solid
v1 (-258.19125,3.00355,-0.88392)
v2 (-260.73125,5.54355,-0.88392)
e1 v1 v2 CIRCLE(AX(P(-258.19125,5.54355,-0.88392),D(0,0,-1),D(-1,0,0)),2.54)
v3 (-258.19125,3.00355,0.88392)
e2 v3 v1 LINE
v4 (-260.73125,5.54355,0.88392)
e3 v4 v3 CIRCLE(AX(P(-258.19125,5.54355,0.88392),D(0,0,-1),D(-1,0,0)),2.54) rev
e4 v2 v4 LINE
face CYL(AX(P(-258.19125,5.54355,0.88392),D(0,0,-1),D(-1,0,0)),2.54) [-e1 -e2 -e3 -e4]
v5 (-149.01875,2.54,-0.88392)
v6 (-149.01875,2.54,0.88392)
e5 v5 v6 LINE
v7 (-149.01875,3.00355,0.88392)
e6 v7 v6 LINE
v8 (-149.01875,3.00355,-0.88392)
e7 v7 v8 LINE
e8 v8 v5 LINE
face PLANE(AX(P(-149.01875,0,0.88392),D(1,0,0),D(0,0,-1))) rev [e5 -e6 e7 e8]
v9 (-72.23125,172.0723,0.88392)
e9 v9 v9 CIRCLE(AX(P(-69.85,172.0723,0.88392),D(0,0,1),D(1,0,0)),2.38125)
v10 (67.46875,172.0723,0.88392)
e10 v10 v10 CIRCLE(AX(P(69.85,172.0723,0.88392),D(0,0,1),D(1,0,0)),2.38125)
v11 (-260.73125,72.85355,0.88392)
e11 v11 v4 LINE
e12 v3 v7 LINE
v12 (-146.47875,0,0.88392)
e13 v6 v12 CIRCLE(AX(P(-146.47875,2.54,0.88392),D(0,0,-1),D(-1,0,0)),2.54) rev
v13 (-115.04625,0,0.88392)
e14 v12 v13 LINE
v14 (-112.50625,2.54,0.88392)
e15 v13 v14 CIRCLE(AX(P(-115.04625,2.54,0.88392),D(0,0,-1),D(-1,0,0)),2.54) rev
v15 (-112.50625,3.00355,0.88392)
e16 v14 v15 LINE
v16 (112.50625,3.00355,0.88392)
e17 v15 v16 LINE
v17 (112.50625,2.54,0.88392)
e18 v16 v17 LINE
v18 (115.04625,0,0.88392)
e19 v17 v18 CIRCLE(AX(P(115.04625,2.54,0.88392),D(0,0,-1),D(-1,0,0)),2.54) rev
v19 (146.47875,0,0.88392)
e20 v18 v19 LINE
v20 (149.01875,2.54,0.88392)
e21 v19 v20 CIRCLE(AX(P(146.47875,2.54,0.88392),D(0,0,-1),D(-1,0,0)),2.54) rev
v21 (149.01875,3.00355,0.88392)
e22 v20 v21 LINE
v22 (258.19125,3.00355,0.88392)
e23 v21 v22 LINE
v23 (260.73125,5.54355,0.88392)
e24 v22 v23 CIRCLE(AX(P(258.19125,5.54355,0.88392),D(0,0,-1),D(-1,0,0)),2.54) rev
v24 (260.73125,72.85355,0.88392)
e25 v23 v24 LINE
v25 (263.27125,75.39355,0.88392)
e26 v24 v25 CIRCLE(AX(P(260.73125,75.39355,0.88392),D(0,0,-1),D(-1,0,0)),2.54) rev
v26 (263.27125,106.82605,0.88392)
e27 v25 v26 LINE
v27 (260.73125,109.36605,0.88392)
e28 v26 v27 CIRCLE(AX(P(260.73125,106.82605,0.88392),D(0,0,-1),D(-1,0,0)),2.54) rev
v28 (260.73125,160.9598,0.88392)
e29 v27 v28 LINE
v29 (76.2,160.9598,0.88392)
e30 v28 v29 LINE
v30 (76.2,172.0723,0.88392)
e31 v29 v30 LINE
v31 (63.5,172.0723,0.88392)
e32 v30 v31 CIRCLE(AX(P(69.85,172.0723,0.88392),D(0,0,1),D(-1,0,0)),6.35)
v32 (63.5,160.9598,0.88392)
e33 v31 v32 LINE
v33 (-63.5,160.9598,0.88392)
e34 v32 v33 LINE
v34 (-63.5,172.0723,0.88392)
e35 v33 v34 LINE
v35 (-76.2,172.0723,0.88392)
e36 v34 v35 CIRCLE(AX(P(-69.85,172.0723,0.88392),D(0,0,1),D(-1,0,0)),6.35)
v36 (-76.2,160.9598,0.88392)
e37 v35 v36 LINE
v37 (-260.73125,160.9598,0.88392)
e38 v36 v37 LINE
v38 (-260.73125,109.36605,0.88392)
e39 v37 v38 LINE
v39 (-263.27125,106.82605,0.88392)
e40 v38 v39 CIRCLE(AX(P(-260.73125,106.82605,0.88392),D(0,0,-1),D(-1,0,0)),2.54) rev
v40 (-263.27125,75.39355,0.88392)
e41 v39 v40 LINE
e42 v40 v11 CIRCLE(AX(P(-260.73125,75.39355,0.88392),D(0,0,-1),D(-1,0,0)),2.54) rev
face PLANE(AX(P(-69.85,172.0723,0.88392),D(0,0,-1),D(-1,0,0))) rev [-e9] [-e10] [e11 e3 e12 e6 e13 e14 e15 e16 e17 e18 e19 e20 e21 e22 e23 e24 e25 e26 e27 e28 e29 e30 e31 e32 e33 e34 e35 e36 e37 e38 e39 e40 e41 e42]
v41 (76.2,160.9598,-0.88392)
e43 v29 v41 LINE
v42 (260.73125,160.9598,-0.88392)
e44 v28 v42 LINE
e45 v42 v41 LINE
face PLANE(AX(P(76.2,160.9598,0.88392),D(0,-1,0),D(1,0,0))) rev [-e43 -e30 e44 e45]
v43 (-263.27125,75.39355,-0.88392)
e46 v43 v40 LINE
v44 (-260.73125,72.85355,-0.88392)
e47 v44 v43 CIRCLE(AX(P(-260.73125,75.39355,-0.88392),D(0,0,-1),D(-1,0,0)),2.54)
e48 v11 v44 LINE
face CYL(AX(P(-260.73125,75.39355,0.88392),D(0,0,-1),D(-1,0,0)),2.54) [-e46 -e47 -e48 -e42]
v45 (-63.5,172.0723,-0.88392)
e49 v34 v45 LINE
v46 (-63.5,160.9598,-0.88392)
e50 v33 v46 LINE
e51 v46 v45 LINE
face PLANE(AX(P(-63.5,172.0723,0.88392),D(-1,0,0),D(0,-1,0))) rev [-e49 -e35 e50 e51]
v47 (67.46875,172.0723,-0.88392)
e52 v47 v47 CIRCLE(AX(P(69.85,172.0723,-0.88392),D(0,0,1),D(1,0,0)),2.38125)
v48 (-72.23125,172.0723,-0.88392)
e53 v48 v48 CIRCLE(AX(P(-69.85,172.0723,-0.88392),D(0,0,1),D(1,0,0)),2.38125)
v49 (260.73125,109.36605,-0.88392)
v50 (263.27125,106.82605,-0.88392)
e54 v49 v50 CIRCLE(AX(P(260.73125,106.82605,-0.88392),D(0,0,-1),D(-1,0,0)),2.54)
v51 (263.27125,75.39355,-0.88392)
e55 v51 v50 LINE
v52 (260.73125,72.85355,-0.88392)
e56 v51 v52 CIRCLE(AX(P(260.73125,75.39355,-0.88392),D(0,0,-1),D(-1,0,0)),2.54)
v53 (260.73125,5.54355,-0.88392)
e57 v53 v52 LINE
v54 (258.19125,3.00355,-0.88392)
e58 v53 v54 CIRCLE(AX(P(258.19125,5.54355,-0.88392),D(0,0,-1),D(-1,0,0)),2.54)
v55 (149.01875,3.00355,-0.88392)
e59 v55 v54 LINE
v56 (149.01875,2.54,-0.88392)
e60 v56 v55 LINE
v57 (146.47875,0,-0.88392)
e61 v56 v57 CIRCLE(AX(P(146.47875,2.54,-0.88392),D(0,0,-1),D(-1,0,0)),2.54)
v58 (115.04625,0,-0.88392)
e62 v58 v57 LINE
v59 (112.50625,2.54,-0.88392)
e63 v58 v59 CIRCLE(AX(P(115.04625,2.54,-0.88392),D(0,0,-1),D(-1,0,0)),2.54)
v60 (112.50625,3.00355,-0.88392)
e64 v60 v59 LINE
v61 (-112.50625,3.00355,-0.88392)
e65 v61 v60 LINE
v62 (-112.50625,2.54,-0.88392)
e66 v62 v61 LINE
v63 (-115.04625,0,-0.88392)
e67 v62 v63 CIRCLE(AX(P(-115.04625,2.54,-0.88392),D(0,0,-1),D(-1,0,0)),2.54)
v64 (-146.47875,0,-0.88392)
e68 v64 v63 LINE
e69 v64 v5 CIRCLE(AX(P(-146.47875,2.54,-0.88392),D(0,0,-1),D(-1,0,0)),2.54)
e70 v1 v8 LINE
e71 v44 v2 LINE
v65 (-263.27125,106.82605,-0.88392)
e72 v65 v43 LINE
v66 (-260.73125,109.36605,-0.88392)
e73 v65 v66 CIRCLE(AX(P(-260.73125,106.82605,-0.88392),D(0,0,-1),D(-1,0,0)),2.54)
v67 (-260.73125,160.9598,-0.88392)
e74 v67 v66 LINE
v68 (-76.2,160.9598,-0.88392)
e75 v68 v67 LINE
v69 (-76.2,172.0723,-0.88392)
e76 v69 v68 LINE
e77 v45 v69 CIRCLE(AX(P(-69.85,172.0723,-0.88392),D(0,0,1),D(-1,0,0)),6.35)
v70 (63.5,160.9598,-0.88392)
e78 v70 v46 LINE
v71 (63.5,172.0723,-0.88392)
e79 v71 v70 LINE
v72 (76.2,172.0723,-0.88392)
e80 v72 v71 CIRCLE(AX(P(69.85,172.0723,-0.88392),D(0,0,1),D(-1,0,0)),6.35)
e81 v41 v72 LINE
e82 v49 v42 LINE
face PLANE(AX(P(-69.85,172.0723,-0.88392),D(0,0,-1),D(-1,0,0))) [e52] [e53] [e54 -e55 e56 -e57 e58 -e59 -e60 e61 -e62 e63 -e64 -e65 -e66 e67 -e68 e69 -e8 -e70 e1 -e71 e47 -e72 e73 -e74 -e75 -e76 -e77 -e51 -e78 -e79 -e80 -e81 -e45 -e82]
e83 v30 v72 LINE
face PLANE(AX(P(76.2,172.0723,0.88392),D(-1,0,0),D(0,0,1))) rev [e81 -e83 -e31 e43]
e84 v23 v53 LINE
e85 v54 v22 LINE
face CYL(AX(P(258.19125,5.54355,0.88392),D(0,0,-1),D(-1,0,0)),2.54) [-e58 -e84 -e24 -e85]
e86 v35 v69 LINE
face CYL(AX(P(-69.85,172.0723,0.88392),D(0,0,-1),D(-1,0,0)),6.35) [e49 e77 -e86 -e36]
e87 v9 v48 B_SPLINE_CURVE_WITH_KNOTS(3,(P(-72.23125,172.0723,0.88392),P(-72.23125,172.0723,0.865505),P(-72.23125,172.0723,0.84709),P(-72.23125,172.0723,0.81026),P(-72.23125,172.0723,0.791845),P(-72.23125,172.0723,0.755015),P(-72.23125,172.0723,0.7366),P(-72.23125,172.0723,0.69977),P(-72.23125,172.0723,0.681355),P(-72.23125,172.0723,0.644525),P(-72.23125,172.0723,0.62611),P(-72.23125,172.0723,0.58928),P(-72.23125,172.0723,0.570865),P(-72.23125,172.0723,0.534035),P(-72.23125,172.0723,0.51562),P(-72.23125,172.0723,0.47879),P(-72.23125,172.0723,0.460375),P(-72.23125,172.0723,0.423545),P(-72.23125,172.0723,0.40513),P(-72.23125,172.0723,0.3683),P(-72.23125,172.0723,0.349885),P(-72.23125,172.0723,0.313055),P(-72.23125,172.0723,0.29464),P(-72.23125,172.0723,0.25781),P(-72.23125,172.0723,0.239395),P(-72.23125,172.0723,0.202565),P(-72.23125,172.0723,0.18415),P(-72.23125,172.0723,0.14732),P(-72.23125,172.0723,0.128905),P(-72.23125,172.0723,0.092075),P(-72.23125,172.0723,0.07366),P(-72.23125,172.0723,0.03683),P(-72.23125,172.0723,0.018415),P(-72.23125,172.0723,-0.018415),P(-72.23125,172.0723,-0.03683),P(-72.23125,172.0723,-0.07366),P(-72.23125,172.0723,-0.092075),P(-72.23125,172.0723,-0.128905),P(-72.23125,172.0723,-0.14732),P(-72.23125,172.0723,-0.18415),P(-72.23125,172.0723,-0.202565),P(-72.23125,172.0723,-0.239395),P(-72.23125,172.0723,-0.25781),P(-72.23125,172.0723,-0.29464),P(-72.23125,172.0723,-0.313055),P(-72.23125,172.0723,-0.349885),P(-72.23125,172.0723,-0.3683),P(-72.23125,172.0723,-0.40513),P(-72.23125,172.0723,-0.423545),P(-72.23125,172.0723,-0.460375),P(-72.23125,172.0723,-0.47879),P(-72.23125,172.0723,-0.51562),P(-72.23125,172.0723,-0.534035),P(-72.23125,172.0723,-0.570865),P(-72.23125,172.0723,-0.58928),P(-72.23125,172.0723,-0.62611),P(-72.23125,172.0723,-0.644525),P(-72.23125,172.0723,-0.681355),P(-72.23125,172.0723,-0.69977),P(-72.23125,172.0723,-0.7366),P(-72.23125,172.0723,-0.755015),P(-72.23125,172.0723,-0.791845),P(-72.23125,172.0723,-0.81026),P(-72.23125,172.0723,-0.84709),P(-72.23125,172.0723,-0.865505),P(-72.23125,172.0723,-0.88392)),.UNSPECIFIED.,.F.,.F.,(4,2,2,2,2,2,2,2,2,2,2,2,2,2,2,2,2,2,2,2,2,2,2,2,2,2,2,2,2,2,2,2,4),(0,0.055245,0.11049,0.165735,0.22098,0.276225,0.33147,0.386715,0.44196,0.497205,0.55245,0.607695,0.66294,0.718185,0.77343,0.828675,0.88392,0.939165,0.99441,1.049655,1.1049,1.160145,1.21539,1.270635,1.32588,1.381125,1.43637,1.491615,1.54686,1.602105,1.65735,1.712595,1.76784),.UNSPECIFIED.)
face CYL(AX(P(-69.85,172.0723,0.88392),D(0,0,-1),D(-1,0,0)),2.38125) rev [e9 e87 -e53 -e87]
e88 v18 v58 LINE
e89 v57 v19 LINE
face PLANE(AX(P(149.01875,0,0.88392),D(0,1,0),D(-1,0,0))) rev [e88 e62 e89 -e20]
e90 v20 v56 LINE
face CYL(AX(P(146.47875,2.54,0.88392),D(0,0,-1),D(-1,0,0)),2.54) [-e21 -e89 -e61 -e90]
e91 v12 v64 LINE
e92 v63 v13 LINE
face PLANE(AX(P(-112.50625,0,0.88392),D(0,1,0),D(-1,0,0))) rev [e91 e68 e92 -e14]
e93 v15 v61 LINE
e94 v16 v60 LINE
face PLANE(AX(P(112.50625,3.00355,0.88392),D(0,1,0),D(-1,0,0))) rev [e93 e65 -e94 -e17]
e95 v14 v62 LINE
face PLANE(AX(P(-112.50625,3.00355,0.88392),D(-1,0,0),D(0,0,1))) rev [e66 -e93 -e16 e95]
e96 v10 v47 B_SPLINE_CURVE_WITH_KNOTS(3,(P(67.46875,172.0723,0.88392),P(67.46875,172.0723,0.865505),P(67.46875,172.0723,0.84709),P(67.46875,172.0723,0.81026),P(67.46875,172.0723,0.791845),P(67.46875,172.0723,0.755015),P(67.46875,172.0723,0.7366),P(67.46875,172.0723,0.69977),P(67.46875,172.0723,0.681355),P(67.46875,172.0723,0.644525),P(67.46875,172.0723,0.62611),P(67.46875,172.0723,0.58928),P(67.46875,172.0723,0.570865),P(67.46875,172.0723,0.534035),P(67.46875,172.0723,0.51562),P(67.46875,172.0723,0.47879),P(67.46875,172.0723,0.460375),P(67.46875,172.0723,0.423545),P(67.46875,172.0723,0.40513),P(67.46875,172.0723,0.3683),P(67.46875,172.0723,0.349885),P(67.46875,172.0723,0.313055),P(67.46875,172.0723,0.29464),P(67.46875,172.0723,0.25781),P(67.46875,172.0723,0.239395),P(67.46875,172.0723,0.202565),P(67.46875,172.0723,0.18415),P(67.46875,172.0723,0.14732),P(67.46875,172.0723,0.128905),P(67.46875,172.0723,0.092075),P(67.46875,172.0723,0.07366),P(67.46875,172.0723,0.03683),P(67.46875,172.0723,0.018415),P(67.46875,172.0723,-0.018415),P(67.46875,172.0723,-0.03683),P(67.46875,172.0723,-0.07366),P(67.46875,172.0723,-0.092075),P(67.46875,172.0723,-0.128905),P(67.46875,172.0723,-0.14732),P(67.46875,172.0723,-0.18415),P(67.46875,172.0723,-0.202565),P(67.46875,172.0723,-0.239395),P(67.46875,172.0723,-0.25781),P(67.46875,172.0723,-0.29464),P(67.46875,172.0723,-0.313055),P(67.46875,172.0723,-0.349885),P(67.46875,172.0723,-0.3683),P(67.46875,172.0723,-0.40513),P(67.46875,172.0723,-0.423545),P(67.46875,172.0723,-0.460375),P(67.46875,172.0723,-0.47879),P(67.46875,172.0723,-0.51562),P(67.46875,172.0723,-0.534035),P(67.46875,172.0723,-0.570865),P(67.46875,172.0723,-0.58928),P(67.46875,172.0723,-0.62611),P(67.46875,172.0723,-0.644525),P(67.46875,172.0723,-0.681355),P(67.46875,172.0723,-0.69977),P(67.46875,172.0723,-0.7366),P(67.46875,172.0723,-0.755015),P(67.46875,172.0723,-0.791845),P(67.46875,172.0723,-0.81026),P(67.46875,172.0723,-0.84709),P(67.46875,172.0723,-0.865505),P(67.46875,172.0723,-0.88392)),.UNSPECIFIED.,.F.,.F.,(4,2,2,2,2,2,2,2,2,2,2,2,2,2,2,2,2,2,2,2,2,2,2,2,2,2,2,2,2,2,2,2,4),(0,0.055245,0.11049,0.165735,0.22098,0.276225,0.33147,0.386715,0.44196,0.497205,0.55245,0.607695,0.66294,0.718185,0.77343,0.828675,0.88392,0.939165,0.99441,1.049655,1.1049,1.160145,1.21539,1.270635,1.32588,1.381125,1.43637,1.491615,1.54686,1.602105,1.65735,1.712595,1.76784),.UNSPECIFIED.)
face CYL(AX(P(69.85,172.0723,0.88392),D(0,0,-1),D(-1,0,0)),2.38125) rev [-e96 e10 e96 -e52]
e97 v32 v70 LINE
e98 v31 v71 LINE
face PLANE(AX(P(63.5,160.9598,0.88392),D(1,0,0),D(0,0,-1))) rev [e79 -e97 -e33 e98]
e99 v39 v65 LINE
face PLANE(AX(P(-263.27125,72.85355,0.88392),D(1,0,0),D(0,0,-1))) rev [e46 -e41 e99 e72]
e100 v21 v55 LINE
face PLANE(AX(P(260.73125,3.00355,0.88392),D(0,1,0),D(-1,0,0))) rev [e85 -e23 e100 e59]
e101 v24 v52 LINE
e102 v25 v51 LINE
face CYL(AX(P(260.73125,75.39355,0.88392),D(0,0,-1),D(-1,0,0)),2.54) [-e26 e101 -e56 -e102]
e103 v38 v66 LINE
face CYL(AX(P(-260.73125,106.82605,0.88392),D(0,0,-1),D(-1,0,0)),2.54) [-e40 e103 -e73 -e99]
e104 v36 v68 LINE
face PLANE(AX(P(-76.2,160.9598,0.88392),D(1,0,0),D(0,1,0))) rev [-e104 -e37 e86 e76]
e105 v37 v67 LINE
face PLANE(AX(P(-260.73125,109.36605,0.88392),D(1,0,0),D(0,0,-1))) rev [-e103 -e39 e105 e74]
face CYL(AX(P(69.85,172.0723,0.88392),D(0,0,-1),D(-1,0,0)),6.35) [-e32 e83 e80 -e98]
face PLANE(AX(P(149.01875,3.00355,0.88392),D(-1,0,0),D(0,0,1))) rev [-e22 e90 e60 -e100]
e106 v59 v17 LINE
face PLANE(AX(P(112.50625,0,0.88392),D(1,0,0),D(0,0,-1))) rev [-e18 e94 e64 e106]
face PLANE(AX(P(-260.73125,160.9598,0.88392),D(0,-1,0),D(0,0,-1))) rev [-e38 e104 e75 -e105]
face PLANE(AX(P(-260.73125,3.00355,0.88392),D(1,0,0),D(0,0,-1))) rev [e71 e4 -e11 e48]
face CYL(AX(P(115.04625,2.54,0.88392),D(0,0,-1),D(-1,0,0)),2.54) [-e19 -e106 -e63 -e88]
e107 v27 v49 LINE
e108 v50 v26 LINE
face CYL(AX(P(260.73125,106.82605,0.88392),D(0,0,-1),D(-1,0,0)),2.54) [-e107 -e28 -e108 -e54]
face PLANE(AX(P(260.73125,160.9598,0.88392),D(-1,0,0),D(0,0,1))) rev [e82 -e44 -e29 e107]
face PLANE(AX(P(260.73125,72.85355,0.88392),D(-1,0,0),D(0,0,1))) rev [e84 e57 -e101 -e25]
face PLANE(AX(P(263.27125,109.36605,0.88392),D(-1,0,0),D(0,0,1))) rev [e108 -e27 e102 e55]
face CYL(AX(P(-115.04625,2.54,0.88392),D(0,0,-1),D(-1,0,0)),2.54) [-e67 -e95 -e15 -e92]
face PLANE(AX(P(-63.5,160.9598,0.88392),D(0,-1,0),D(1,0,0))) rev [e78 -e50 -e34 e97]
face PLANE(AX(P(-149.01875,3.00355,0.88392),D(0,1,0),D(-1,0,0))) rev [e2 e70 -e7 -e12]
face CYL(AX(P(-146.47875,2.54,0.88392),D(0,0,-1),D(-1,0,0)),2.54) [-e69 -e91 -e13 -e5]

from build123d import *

# Parameters (mm, degrees)
SKETCH1_R           = 2.38125
BOSS_EXTRUDE1_DEPTH = 0.88392
FILLET1_R           = 2.54


with BuildPart() as part:
    # Sketch1 → Boss-Extrude1 (new, symmetric)
    with BuildSketch(Plane.XY):
        with BuildLine():
            Line((-260.731250444, 160.9598), (-76.2, 160.9598))
            Line((-76.2, 160.9598), (-76.2, 172.0723))
            ThreePointArc((-76.2, 172.0723), (-69.85, 178.4223), (-63.5, 172.0723))
            Line((-63.5, 172.0723), (-63.5, 160.9598))
            Line((-63.5, 160.9598), (63.5, 160.9598))
            Line((63.5, 160.9598), (63.5, 172.0723))
            ThreePointArc((63.5, 172.0723), (69.85, 178.4223), (76.2, 172.0723))
            Line((76.2, 172.0723), (76.2, 160.9598))
            Line((76.2, 160.9598), (260.731250444, 160.9598))
            Line((260.731250444, 160.9598), (260.731250444, 109.36605))
            Line((260.731250444, 109.36605), (263.271250444, 109.36605))
            Line((263.271250444, 109.36605), (263.271250444, 72.85355))
            Line((263.271250444, 72.85355), (260.731250444, 72.85355))
            Line((260.731250444, 72.85355), (260.731250444, 3.00355))
            Line((260.731250444, 3.00355), (149.018750222, 3.00355))
            Line((149.018750222, 3.00355), (149.018750222, 0))
            Line((149.018750222, 0), (112.506250222, 0))
            Line((112.506250222, 0), (112.506250222, 3.00355))
            Line((112.506250222, 3.00355), (-112.506250222, 3.00355))
            Line((-112.506250222, 3.00355), (-112.506250222, 0))
            Line((-112.506250222, 0), (-149.018750222, 0))
            Line((-149.018750222, 0), (-149.018750222, 3.00355))
            Line((-149.018750222, 3.00355), (-260.731250444, 3.00355))
            Line((-260.731250444, 3.00355), (-260.731250444, 72.85355))
            Line((-260.731250444, 72.85355), (-263.271250444, 72.85355))
            Line((-263.271250444, 72.85355), (-263.271250444, 109.36605))
            Line((-263.271250444, 109.36605), (-260.731250444, 109.36605))
            Line((-260.731250444, 109.36605), (-260.731250444, 160.9598))
        make_face()
        with Locations(Location((-69.85, 172.0723, 0), (0, 0, 180))):
            Circle(SKETCH1_R, mode=Mode.SUBTRACT)
        with Locations(Location((69.85, 172.0723, 0), (0, 0, 180))):
            Circle(SKETCH1_R, mode=Mode.SUBTRACT)
    extrude(amount=BOSS_EXTRUDE1_DEPTH, both=True)

    # Fillet1
    fillet1_edges = [part.edges().sort_by_distance(p)[0] for p in [
        (-263.271250444, 109.36605, 0),
        (-263.271250444, 72.85355, 0),
        (263.271250444, 109.36605, 0),
        (263.271250444, 72.85355, 0),
        (149.018750222, 0, 0),
        (112.506250222, 0, 0),
        (-112.506250222, 0, 0),
        (-149.018750222, 0, 0),
        (-260.731250444, 3.00355, 0),
        (260.731250444, 3.00355, 0),
    ]]
    fillet(fillet1_edges, radius=FILLET1_R - 0.0001)  # a hair under: the kernel refuses the full size


solid = part.part
